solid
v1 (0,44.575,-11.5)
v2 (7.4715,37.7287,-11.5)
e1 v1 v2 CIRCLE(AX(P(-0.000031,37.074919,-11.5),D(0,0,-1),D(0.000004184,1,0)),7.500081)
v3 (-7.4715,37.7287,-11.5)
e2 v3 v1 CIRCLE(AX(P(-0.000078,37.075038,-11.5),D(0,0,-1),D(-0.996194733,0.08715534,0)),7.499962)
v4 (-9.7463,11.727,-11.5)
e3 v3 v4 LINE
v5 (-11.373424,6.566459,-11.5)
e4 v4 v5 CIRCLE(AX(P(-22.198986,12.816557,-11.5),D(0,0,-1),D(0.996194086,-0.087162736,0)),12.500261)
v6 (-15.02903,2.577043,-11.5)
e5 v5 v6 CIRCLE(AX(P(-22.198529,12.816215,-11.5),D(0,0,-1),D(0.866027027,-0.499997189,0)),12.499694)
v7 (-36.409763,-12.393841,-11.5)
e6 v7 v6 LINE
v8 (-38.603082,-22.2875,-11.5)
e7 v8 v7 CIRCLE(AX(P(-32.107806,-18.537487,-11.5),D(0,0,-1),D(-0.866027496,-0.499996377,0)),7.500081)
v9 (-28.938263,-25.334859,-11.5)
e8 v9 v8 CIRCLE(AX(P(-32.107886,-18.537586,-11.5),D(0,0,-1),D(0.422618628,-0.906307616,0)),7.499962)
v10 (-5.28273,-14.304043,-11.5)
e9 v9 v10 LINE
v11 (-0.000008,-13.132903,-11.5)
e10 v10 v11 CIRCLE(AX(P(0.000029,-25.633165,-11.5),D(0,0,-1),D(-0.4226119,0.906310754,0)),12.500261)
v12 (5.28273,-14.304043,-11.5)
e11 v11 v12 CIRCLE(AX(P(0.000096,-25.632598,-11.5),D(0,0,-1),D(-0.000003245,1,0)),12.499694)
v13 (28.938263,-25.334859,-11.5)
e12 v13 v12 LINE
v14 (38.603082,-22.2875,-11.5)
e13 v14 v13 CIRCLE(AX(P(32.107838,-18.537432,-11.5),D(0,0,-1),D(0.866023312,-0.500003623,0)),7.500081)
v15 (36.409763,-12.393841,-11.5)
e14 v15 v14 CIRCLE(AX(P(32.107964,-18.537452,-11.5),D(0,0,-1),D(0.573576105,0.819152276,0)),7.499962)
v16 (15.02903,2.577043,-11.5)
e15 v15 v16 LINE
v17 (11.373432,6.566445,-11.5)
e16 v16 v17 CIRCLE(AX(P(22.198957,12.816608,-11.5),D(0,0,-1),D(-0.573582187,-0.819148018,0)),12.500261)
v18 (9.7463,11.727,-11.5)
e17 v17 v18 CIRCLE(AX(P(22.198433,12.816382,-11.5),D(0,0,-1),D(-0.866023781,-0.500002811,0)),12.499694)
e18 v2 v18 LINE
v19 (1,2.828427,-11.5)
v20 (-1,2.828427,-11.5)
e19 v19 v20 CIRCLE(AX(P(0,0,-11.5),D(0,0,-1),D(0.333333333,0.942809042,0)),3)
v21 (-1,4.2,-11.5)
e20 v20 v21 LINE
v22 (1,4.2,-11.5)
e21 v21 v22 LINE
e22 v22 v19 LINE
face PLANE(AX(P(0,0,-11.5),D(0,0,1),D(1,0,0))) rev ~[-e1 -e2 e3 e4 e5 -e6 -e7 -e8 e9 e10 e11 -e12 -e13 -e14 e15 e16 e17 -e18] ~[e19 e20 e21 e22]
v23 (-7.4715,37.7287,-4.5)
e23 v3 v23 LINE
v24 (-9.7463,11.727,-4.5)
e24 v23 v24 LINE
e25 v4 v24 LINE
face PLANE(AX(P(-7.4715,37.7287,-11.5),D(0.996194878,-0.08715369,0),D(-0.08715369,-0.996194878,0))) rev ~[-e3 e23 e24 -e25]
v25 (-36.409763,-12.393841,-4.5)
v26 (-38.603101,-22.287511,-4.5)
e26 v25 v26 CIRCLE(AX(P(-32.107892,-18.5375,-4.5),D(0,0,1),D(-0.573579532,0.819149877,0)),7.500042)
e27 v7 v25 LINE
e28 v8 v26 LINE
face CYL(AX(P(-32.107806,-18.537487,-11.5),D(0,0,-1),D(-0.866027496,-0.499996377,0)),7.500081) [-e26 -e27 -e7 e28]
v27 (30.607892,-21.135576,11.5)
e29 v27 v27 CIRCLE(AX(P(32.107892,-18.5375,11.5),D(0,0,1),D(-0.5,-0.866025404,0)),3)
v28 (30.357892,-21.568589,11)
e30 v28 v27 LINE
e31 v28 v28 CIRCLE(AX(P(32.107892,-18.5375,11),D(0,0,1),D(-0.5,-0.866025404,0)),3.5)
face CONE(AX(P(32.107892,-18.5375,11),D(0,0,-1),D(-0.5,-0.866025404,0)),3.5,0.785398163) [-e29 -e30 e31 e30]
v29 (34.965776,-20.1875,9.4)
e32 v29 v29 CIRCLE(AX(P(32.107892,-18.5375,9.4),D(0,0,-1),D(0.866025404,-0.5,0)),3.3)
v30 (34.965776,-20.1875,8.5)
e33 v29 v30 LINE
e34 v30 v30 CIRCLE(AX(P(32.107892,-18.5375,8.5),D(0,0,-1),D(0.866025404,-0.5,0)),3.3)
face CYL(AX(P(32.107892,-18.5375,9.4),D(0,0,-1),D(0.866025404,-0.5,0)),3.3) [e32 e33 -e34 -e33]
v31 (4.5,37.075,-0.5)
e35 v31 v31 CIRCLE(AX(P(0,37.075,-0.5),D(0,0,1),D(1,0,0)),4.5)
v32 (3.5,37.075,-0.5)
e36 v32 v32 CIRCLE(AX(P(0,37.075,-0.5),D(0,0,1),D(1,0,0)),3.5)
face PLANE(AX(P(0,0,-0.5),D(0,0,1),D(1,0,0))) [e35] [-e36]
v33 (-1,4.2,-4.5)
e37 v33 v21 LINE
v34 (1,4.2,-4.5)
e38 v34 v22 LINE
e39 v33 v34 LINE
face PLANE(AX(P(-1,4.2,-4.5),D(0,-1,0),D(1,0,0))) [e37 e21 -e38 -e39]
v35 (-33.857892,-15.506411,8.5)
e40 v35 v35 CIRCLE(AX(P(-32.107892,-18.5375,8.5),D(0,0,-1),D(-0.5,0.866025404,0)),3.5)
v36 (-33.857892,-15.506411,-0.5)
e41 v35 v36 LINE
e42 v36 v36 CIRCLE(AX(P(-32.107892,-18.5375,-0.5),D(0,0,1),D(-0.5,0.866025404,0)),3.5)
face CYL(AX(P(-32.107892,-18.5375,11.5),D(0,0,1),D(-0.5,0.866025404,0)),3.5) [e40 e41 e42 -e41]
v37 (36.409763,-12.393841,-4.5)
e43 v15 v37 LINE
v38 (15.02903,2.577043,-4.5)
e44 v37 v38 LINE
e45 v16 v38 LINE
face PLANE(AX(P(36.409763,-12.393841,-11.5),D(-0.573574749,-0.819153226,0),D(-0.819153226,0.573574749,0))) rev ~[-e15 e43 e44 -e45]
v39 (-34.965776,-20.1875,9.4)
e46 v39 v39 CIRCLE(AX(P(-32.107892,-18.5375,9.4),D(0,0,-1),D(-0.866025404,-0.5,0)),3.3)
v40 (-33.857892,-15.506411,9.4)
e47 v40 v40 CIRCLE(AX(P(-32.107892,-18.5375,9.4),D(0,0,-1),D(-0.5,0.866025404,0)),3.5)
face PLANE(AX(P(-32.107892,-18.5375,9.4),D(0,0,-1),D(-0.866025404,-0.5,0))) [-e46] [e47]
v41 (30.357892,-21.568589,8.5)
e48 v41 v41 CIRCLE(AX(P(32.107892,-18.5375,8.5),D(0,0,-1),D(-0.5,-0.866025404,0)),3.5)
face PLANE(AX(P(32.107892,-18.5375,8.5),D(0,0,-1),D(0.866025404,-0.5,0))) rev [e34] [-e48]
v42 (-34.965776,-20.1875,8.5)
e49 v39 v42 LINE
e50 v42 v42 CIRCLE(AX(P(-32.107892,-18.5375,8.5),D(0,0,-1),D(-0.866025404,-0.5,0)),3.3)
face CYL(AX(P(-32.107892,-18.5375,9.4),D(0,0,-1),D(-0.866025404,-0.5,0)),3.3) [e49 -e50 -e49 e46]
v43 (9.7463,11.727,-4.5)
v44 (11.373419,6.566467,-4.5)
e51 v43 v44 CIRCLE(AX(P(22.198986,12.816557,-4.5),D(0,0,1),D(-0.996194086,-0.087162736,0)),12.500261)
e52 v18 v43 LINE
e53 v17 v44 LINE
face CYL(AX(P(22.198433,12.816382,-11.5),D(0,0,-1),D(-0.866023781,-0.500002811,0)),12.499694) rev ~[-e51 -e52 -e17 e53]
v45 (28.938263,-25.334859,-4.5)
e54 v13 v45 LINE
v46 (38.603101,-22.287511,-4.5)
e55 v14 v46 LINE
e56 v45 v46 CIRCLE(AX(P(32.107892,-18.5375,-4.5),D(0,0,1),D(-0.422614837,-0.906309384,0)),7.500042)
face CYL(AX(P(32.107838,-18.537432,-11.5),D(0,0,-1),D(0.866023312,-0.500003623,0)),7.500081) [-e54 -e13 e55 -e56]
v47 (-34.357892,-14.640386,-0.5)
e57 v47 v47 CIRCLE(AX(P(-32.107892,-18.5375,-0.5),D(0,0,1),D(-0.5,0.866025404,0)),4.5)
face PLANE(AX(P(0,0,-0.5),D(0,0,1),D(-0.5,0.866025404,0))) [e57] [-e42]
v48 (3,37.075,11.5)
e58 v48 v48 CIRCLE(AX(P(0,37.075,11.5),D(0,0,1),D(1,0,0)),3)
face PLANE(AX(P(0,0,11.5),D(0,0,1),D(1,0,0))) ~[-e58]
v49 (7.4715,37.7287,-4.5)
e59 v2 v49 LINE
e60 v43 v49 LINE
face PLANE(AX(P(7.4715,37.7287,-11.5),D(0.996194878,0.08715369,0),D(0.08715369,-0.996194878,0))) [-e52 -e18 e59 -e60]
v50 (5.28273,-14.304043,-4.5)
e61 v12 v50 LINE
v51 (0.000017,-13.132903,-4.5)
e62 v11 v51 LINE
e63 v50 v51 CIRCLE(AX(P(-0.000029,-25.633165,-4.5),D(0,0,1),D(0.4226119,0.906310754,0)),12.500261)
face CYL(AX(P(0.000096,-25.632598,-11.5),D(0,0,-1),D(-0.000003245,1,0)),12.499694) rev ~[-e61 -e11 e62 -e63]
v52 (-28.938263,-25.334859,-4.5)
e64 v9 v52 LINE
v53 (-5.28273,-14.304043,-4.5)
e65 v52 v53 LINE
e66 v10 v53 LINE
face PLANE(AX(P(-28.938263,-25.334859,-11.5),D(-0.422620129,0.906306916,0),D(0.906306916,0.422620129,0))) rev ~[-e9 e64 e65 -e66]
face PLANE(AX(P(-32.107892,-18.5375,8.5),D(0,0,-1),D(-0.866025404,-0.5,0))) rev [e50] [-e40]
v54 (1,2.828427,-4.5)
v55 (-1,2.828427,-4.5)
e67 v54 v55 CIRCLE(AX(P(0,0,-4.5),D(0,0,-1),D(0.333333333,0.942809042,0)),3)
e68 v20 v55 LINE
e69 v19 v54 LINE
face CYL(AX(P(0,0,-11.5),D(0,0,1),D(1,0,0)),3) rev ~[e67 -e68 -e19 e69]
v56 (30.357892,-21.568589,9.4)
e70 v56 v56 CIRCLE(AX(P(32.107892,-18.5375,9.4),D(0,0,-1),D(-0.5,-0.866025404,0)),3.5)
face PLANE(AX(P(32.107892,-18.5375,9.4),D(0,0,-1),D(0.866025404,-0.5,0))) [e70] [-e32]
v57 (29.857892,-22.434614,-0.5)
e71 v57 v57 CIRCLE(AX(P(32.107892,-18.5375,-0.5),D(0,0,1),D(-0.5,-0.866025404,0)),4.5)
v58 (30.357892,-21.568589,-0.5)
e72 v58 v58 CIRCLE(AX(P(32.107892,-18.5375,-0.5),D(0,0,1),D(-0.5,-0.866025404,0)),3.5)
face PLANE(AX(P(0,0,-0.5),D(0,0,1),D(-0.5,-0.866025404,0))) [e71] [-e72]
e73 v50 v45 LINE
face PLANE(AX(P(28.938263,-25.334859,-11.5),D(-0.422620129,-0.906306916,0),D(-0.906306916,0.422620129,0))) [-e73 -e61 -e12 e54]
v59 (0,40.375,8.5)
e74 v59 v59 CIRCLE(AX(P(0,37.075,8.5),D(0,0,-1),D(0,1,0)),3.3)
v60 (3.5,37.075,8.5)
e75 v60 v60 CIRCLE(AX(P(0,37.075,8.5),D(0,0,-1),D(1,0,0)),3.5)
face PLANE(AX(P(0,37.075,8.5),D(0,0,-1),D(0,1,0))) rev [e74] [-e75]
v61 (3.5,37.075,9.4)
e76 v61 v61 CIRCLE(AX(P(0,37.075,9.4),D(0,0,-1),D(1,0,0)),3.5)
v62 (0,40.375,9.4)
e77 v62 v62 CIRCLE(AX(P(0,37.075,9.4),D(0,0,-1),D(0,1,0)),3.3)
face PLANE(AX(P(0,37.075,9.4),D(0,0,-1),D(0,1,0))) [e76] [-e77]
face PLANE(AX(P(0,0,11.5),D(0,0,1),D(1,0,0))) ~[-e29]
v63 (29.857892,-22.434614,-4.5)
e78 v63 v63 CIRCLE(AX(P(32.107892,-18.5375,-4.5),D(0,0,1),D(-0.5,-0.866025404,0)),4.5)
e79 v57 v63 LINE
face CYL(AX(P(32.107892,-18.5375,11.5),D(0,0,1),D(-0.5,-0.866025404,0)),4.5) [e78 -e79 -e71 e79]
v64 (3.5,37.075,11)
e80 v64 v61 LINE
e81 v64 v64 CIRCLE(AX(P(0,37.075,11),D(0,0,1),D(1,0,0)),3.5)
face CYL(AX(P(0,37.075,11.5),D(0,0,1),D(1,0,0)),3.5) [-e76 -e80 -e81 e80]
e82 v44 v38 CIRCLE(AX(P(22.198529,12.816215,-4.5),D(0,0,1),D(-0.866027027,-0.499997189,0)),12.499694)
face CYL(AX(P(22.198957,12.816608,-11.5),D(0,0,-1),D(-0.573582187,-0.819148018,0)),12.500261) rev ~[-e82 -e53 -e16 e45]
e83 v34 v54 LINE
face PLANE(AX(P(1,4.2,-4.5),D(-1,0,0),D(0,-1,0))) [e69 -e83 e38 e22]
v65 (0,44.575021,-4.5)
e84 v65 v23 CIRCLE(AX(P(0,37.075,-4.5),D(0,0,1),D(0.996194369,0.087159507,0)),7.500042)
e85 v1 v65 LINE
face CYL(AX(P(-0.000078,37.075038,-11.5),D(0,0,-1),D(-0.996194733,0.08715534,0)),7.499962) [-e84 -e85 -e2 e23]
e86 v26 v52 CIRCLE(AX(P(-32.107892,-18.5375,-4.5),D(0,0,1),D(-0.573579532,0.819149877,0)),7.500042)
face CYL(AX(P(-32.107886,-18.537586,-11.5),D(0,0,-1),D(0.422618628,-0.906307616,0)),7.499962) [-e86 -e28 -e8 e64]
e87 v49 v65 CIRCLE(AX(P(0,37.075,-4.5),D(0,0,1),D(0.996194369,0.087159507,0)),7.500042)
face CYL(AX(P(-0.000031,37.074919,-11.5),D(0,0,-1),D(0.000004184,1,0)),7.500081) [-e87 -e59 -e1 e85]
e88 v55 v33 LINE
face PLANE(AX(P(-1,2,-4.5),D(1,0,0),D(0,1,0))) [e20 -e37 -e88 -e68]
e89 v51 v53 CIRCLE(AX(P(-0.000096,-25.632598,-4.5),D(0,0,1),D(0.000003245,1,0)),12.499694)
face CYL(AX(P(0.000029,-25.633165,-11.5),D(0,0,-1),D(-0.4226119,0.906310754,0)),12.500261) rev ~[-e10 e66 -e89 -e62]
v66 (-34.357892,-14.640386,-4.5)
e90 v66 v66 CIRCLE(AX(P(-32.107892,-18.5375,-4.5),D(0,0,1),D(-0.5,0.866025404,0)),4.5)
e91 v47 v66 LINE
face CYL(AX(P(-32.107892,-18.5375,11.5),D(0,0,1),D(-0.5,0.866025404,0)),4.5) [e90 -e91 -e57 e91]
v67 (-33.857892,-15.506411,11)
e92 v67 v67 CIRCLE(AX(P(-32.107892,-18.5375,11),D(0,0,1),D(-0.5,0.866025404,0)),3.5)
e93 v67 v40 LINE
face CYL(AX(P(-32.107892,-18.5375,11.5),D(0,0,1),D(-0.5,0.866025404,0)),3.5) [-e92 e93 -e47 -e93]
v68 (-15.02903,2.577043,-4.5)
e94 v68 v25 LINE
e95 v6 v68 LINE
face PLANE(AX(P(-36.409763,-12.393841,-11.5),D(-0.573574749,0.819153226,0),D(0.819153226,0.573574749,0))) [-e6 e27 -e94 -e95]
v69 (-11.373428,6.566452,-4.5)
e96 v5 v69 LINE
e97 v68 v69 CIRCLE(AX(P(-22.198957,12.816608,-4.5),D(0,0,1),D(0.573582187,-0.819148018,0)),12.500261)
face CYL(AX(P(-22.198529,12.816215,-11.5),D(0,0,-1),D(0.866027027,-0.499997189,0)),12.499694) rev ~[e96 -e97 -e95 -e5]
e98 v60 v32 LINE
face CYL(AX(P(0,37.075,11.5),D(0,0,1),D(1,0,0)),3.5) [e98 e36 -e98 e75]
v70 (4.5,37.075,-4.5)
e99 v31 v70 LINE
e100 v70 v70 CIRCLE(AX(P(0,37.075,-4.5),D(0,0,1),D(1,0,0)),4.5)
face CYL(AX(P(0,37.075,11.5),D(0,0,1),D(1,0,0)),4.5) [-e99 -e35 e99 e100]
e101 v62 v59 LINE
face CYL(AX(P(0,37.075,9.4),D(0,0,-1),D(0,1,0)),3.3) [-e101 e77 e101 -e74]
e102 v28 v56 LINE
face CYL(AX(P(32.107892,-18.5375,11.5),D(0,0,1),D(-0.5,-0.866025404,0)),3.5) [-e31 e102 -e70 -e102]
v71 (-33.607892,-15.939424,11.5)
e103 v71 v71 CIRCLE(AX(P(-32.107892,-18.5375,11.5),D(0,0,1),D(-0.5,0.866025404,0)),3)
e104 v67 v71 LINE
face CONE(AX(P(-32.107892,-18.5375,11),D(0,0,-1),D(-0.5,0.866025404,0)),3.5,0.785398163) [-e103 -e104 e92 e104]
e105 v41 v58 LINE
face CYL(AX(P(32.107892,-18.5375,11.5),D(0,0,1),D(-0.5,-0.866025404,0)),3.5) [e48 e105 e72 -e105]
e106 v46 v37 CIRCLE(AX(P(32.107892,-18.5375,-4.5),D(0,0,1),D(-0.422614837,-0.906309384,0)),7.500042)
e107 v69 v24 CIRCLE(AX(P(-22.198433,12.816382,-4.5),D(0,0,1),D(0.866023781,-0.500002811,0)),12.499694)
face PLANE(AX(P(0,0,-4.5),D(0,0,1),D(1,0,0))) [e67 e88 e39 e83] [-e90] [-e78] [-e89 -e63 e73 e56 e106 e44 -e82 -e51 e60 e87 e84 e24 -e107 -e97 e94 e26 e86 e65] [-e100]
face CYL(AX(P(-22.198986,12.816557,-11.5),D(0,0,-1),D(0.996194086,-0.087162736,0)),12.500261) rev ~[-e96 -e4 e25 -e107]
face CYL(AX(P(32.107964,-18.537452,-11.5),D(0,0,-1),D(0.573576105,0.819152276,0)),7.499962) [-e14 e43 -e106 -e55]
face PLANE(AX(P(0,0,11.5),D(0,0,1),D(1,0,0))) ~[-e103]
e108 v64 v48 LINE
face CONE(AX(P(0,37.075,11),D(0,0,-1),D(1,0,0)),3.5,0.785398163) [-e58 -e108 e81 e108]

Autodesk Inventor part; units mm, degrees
ref_plane "YZ Plane" through (0, 0, 0) normal (1, 0, 0) x (0, 1, 0)
ref_plane "XZ Plane" through (0, 0, 0) normal (0, 1, 0) x (-1, 0, 0)
ref_plane "XY Plane" through (0, 0, 0) normal (0, 0, 1) x (1, 0, 0)
sketch "Sketch1" plane through (0, 0, 0) normal (0, 1, 0) x (-1, 0, 0)
  line L0 (0, -16.1) -> (0, 16.1) construction
  line L1 (-54, 0) -> (9, 0) construction
  line L2 (-3, 11.5) -> (-45, 11.5)
  line L3 (-45, 11.5) -> (-45, -11.5)
  line L4 (-45, -11.5) -> (-3, -11.5)
  line L5 (-3, -11.5) -> (-3, 11.5)
  point P0 (0, 0)
  dimension "d1" = 23
  dimension "d4" = 45
  dimension "d36" = 3
revolve "Revolution1" add sketch "Sketch1" angle 360 about axis through (0, 0, 0) along (0, 0, 1)
sketch "Sketch2" plane through (0, 0, -11.5) normal (0, 0, -1) x (-1, 0, 0)
  line L0 (0, -63.2055) -> (0, 64.2333) construction
  line L1 (-63, 0) -> (63, 0) construction
  arc A0 (7.4715, 37.7287) -> (0, 44.575) centre (0, 37.075) ccw
  line L2 (0, 0) -> (38.9711, -22.5) construction
  circle A1 centre (0, 0) radius 45 projected
  line L3 (0, 0) -> (-38.9711, -22.5) construction
  line L4 (0, 0) -> (38.9711, 22.5)
  arc A2 (9.7463, 11.727) -> (11.3734, 6.5665) centre (22.1987, 12.8165) ccw
  line L5 (7.4715, 37.7287) -> (9.7463, 11.727)
  arc A3 (0, 44.575) -> (-7.4715, 37.7287) centre (0, 37.075) ccw
  arc A4 (-11.3734, 6.5665) -> (-9.7463, 11.727) centre (-22.1987, 12.8165) ccw
  line L6 (-7.4715, 37.7287) -> (-9.7463, 11.727)
  line L7 (0, 0) -> (-2.1651, 1.25)
  line L8 (-11.3734, 6.5665) -> (-38.9711, 22.5)
  point P0 (-38.9711, 22.5)
  point P1 (0, 45)
  point P2 (0, 45)
  dimension "d6" = 15
  dimension "d7" = 120
  dimension "d8" = 120
  dimension "d9" = 60
  dimension "d10" = 60
  dimension "d11" = 37.075
  dimension "d12" = 25
  dimension "d13" = 5
extrude "Extrusion1" cut sketch "Sketch2" against normal through all contours A0 A3 L6 A4 L8 A1 L4 A2 L5 picked at (-14.556, 28.6205)
sketch "Sketch4" plane through (0, 0, 11.5) normal (0, 0, 1) x (1, 0, 0)
  line L0 (38.9711, 22.5) -> (11.3734, 6.5665) projected
  arc A0 (9.7463, 11.727) -> (11.3734, 6.5665) centre (22.1987, 12.8165) ccw projected
  line L1 (9.7463, 11.727) -> (7.4715, 37.7287) projected
  arc A1 (7.4715, 37.7287) -> (-7.4715, 37.7287) centre (0, 37.075) ccw projected
  line L2 (-7.4715, 37.7287) -> (-9.7463, 11.727) projected
  arc A2 (-11.3734, 6.5665) -> (-9.7463, 11.727) centre (-22.1987, 12.8165) ccw projected
  line L3 (-11.3734, 6.5665) -> (-38.9711, 22.5) projected
  arc A3 (-38.9711, 22.5) -> (38.9711, 22.5) centre (0, 0) ccw projected
  circle A4 centre (0, 37.075) radius 4.5
  line L4 (-38.9711, 22.5) -> (0, 0)
  line L5 (0, 0) -> (38.9711, 22.5)
  circle A5 centre (0, 37.075) radius 3.5
  point P0 (-11.3734, 6.5665)
  dimension "d20" = 9
  dimension "d23" = 7
extrude "Extrusion2" cut sketch "Sketch4" against normal blind 16 contours L5 L4 A2 L2 A1 L1 A0
extrude "Extrusion4" cut sketch "Sketch4" against normal blind 12 contours A4
sketch "Sketch6" plane through (0, 0, 0) normal (1, 0, 0) x (0, 1, 0)
  line L0 (40.575, -0.5) -> (33.575, -0.5) projected
  line L1 (40.575, 11.5) -> (33.575, 11.5) projected
  line L2 (33.575, -0.5) -> (33.575, 11.5) projected
  line L3 (40.575, -0.5) -> (40.575, 11.5) projected
  line L4 (40.575, 9.4) -> (40.375, 9.4)
  line L5 (40.375, 9.4) -> (40.375, 8.5)
  line L6 (40.375, 8.5) -> (40.575, 8.5)
  line L7 (40.575, 8.5) -> (40.575, 9.4)
  line L8 (37.075, 16.1) -> (37.075, -16.1) projected
  point P0 (0, 0)
  dimension "d29" = 9
  dimension "d34" = 6.8
  dimension "d35" = 0.9
revolve "Revolution2" cut sketch "Sketch6" angle 360 about axis through (0, 37.075, 11.5) along (0, 0, -1) contours L6 L5 L4 L3
chamfer "Chamfer1" distance 0.5 angle 45 1 edges at (-3.5, 37.075, 11.5)
pattern_circular "Circular Pattern1" count 3 over 360 about axis through (0, 0, -10) along (0, 0, 1) of "Extrusion1", "Extrusion2", "Extrusion4", "Revolution2", "Chamfer1"
sketch "Sketch7" plane through (0, 0, -4.5) normal (0, 0, 1) x (1, 0, 0)
  circle A0 centre (0, 0) radius 3 construction
  line L0 (-1, 4.2) -> (1, 4.2)
  line L1 (1, 4.2) -> (1, 2)
  line L2 (1, 2) -> (-1, 2)
  line L3 (-1, 2) -> (-1, 4.2)
  line L4 (0, 58.6975) -> (0, -40.16) construction
  line L5 (-55.451, 0) -> (55.451, 0) construction
  dimension "d37" = 2
  dimension "d38" = 2.2
  dimension "d39" = 2
extrude "Extrusion5" cut sketch "Sketch7" against normal through all
equation "\"d9\" = d10"
properties part number "Shaft_interstage" material "Steel"
